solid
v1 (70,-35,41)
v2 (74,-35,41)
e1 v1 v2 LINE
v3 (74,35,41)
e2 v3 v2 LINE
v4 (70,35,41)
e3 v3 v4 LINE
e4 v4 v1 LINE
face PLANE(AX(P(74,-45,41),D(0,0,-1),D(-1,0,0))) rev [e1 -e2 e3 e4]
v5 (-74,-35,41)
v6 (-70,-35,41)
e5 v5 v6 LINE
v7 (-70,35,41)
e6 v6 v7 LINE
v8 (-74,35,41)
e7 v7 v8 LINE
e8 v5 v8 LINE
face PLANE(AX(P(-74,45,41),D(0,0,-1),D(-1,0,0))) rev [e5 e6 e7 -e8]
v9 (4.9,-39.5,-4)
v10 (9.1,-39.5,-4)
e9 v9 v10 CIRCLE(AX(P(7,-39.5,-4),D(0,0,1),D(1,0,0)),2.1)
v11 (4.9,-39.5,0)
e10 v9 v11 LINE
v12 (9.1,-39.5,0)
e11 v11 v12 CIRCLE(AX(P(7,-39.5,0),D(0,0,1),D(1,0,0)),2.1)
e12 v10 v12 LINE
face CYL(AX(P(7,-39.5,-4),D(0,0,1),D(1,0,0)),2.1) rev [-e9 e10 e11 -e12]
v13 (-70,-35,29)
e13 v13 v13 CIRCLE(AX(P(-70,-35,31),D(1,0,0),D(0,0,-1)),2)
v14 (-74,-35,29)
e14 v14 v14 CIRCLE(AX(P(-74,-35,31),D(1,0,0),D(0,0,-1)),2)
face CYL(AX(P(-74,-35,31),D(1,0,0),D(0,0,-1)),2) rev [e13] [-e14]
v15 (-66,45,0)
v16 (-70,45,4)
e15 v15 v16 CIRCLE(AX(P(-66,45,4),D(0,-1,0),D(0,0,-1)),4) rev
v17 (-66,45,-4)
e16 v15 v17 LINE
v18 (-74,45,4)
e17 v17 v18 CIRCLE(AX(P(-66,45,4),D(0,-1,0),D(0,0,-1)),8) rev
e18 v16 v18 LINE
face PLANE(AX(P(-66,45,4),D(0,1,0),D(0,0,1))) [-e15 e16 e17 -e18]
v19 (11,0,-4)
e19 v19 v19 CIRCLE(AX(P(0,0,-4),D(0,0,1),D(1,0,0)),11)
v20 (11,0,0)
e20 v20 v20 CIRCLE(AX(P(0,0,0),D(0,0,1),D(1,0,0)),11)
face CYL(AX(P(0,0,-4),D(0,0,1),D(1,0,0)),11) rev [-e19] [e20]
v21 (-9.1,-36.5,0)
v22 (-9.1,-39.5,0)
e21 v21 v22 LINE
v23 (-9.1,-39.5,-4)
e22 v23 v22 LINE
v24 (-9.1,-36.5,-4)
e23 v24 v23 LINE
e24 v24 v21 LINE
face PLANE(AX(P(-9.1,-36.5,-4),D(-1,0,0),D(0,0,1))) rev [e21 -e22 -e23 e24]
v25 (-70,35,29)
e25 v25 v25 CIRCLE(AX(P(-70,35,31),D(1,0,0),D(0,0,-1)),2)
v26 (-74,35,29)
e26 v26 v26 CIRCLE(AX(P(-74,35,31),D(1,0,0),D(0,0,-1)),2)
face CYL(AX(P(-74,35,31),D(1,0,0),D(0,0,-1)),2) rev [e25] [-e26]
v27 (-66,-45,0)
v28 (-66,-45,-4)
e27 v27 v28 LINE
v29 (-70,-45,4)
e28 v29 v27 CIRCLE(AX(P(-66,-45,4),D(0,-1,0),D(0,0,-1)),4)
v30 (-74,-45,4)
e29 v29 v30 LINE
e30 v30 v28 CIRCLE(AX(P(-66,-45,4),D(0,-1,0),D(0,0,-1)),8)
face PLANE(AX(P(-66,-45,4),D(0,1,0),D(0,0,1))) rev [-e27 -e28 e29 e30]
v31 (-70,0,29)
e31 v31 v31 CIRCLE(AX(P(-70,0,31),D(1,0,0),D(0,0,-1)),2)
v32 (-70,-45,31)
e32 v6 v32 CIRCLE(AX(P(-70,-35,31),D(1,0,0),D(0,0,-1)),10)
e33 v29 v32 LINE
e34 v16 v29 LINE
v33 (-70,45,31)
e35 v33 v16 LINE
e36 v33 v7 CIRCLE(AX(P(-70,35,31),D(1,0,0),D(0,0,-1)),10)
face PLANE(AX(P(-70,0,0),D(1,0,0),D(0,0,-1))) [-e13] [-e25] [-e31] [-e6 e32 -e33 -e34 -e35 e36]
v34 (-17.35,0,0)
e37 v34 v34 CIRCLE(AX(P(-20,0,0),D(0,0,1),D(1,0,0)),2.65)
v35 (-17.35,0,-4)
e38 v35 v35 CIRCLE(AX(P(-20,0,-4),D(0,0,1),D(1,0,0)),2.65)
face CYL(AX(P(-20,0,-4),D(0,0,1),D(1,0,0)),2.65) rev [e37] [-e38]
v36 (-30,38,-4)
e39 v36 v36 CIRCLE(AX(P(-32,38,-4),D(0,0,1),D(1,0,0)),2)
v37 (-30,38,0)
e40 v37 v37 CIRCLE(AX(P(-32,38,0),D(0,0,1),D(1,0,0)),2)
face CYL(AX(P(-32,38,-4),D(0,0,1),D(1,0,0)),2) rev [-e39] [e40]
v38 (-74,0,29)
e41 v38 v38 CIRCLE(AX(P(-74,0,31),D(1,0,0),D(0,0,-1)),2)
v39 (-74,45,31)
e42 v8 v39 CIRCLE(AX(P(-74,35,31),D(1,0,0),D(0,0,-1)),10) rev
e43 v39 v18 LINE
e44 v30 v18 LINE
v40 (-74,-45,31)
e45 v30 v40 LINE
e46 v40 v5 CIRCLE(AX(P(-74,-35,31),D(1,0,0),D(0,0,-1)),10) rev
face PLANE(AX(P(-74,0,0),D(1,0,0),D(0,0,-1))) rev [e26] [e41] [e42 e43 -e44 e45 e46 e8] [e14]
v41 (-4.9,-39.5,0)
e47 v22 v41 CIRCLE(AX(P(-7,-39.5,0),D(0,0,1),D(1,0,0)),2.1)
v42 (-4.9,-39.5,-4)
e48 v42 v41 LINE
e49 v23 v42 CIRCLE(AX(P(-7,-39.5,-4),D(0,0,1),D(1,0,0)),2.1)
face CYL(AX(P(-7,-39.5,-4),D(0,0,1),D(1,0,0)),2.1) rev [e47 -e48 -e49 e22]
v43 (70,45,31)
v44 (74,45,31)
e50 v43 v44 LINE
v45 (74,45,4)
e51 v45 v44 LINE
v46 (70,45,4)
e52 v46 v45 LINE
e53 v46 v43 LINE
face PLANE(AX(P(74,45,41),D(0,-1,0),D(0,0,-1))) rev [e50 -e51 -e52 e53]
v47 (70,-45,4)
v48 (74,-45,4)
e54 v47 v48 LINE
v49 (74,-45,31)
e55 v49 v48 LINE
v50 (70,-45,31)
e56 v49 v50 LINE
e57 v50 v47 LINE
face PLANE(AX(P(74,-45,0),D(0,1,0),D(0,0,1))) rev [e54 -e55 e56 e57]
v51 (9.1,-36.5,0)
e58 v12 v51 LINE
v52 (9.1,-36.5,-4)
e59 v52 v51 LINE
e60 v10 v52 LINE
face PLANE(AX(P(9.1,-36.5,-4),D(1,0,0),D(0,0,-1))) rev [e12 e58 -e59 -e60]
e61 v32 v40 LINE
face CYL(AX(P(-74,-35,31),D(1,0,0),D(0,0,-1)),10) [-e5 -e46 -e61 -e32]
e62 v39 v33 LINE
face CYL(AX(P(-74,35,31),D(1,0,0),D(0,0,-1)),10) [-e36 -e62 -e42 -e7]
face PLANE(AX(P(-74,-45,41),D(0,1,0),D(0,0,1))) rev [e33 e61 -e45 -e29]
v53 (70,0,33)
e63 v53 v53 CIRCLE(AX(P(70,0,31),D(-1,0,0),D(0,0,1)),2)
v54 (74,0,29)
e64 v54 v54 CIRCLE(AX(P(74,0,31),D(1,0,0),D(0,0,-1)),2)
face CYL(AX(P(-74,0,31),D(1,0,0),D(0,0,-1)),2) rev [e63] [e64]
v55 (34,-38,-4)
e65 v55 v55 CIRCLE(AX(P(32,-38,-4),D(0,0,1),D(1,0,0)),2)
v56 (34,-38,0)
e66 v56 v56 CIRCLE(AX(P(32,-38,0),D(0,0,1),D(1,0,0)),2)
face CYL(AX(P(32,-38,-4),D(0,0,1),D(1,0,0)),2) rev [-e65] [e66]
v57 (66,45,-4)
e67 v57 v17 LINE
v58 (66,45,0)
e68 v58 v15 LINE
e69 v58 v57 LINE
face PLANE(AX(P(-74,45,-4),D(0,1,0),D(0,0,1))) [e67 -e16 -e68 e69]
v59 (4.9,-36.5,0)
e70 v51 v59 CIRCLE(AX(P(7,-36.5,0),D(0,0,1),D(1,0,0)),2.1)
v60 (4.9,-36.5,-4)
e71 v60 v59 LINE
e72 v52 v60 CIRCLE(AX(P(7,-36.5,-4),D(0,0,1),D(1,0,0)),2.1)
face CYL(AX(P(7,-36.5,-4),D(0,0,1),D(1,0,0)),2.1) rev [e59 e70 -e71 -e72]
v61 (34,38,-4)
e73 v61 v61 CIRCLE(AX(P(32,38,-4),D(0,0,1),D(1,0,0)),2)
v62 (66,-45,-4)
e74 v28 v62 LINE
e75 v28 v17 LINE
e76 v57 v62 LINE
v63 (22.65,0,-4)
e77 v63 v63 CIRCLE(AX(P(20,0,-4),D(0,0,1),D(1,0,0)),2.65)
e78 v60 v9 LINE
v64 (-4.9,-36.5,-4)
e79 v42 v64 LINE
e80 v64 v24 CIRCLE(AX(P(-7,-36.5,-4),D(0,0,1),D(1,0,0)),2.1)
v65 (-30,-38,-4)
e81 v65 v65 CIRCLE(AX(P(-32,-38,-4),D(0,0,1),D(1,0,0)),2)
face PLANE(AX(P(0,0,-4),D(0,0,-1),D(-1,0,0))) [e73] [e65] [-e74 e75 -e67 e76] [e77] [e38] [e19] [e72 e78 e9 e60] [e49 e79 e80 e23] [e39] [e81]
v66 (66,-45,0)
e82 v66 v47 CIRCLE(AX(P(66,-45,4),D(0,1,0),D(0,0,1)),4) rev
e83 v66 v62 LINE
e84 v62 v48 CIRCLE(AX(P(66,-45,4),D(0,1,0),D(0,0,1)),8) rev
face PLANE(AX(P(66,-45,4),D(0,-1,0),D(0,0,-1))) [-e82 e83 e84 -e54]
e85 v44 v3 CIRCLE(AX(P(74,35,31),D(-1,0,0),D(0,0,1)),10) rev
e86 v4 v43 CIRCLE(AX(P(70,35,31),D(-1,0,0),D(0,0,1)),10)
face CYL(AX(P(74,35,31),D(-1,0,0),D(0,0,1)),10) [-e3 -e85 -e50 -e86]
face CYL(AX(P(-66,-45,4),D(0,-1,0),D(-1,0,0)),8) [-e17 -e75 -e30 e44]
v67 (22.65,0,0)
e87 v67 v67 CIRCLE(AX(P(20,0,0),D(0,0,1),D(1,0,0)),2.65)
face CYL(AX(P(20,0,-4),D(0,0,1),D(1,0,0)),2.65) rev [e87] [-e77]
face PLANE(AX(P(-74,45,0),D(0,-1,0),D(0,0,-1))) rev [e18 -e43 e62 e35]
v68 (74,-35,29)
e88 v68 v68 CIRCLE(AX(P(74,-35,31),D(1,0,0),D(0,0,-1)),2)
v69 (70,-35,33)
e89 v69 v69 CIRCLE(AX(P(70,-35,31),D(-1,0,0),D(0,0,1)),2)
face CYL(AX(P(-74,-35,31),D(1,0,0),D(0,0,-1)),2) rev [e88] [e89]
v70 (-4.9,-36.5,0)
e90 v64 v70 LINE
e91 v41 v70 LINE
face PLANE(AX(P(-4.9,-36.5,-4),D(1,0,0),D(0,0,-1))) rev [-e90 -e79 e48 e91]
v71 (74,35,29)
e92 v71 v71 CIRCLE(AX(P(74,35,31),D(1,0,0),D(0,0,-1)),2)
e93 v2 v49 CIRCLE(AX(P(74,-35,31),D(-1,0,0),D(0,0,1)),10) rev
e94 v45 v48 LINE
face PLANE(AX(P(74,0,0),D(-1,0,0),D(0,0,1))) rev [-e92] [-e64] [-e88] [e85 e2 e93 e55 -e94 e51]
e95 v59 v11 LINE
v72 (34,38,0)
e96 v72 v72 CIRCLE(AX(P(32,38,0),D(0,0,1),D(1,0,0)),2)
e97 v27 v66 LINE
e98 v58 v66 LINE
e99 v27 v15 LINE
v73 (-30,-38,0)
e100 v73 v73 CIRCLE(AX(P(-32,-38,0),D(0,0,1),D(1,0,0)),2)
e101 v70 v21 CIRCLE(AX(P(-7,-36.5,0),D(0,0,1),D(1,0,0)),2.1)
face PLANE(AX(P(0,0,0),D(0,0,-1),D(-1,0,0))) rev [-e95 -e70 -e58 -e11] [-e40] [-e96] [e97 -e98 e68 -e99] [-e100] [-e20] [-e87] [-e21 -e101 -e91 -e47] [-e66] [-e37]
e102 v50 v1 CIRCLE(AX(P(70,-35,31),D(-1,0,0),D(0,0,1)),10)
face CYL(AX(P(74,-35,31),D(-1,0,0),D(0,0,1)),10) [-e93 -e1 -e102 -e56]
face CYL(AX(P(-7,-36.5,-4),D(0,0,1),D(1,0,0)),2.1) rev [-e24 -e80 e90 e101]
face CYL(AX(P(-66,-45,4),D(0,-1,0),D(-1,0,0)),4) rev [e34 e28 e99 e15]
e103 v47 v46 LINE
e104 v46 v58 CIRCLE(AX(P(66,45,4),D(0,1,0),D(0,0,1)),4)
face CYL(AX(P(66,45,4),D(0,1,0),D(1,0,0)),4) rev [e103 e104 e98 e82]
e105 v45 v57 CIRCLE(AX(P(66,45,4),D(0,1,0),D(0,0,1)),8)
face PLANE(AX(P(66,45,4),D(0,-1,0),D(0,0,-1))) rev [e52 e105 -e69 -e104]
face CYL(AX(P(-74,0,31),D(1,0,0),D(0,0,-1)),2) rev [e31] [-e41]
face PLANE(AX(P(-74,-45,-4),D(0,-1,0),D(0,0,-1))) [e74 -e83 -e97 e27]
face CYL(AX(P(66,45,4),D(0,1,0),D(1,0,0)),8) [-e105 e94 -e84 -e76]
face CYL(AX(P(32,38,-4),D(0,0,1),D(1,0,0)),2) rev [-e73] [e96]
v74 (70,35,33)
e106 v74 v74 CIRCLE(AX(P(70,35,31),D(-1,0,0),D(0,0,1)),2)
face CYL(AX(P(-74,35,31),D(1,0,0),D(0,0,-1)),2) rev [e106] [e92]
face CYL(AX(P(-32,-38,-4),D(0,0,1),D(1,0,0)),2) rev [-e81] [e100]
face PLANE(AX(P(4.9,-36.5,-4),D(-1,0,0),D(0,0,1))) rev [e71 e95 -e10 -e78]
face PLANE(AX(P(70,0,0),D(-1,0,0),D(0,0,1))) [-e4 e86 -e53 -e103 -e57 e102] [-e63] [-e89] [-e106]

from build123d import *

# Parameters (mm, degrees)
SKETCH_1_W                         = 148
SKETCH_1_H                         = 90
SKETCH_1_R                         = 11
SKETCH_1_R_2                       = 2.65
SM_BASE_FLANGE_1_DEPTH             = 4
SM_EDGE_FLANGE_1_STRIP_W           = 24
SM_EDGE_FLANGE_1_STRIP_H           = 4
SM_EDGE_FLANGE_1_STRIP_CUT_DEPTH   = 90
SM_EDGE_FLANGE_1_STRIP_2_W         = 24
SM_EDGE_FLANGE_1_STRIP_2_H         = 4
SM_EDGE_FLANGE_1_STRIP_CUT_2_DEPTH = 90
SM_EDGE_FLANGE_1_DEPTH             = 90
SM_EDGE_FLANGE_1_BEND_DEPTH        = 90
SKETCH_12_R                        = 2
CUT_EXTRUDE_1_DEPTH                = 161.031246949
FILLET_1_R                         = 10
SKETCH_13_R                        = 2
CUT_EXTRUDE_2_DEPTH                = 96.822753039


# Sheet-metal steps are written as plain solids
with BuildPart() as part:
    # Sketch 1 → Базовая кромка1 (new body)
    with BuildSketch(Plane.XY):
        Rectangle(SKETCH_1_W, SKETCH_1_H)
        Circle(SKETCH_1_R, mode=Mode.SUBTRACT)
        with Locations((20, 0)):
            Circle(SKETCH_1_R_2, mode=Mode.SUBTRACT)
        with Locations((-20, 0)):
            Circle(SKETCH_1_R_2, mode=Mode.SUBTRACT)
        with BuildLine():
            Line((-4.9, -36.5), (-4.9, -39.5))
            ThreePointArc((-4.9, -39.5), (-7, -41.6), (-9.1, -39.5))
            Line((-9.1, -39.5), (-9.1, -36.5))
            ThreePointArc((-9.1, -36.5), (-7, -34.4), (-4.9, -36.5))
        make_face(mode=Mode.SUBTRACT)
        with BuildLine():
            Line((9.1, -36.5), (9.1, -39.5))
            ThreePointArc((9.1, -39.5), (7, -41.6), (4.9, -39.5))
            Line((4.9, -39.5), (4.9, -36.5))
            ThreePointArc((4.9, -36.5), (7, -34.4), (9.1, -36.5))
        make_face(mode=Mode.SUBTRACT)
    extrude(amount=-SM_BASE_FLANGE_1_DEPTH)

    # Ребро-кромка1 strip (across the edge) → Ребро-кромка1 strip cut (cut)
    with BuildSketch(Plane(origin=(-74, 45, 0), x_dir=(1, 0, 0), z_dir=(0, -1, 0))):
        with Locations((-4, -2)):
            Rectangle(SM_EDGE_FLANGE_1_STRIP_W, SM_EDGE_FLANGE_1_STRIP_H)
    extrude(amount=SM_EDGE_FLANGE_1_STRIP_CUT_DEPTH, mode=Mode.SUBTRACT)

    # Ребро-кромка1 strip 2 (across the edge) → Ребро-кромка1 strip cut 2 (cut)
    with BuildSketch(Plane(origin=(74, -45, 0), x_dir=(-1, 0, 0), z_dir=(0, 1, 0))):
        with Locations((-4, -2)):
            Rectangle(SM_EDGE_FLANGE_1_STRIP_2_W, SM_EDGE_FLANGE_1_STRIP_2_H)
    extrude(amount=SM_EDGE_FLANGE_1_STRIP_CUT_2_DEPTH, mode=Mode.SUBTRACT)

    # Ребро-кромка1 section (across the edge) → Ребро-кромка1 (add)
    with BuildSketch(Plane(origin=(-74, 45, 0), x_dir=(1, 0, 0), z_dir=(0, -1, 0))):
        with BuildLine():
            Line((0, 4), (0, 41))
            Line((0, 41), (4, 41))
            Line((4, 41), (4, 4))
            ThreePointArc((4, 4), (5.171572875, 1.171572875), (8, 0))
            Line((8, 0), (8, -4))
            ThreePointArc((8, -4), (2.343145751, -1.656854249), (0, 4))
        make_face()
    extrude(amount=SM_EDGE_FLANGE_1_DEPTH)

    # Ребро-кромка1 section 2 (across the edge) → Ребро-кромка1 bend (add)
    with BuildSketch(Plane(origin=(74, -45, 0), x_dir=(-1, 0, 0), z_dir=(0, 1, 0))):
        with BuildLine():
            Line((0, 4), (0, 41))
            Line((0, 41), (4, 41))
            Line((4, 41), (4, 4))
            ThreePointArc((4, 4), (5.171572875, 1.171572875), (8, 0))
            Line((8, 0), (8, -4))
            ThreePointArc((8, -4), (2.343145751, -1.656854249), (0, 4))
        make_face()
    extrude(amount=SM_EDGE_FLANGE_1_BEND_DEPTH)

    # Эскиз12 → Вырез-Вытянуть1 (cut, through all)
    with BuildSketch(Plane(origin=(74, 0, 0), x_dir=(0, 0, -1), z_dir=(1, 0, 0))):
        with Locations((-31, 35)):
            Circle(SKETCH_12_R)
        with Locations((-31, -35)):
            Circle(SKETCH_12_R)
        with Locations((-31, 0)):
            Circle(SKETCH_12_R)
    extrude(amount=-CUT_EXTRUDE_1_DEPTH, mode=Mode.SUBTRACT)

    # Скругление1
    fillet_1_edges = [part.edges().sort_by_distance(p)[0] for p in [
        (72, -45, 41),
        (72, 45, 41),
        (-72, 45, 41),
        (-72, -45, 41),
    ]]
    fillet(fillet_1_edges, radius=FILLET_1_R)

    # Эскиз13 → Вырез-Вытянуть2 (cut, through all)
    with BuildSketch(Plane.XY):
        with Locations((-32, 38)):
            Circle(SKETCH_13_R)
        with Locations((32, 38)):
            Circle(SKETCH_13_R)
        with Locations((32, -38)):
            Circle(SKETCH_13_R)
        with Locations((-32, -38)):
            Circle(SKETCH_13_R)
    extrude(amount=-CUT_EXTRUDE_2_DEPTH, mode=Mode.SUBTRACT)


solid = part.part
